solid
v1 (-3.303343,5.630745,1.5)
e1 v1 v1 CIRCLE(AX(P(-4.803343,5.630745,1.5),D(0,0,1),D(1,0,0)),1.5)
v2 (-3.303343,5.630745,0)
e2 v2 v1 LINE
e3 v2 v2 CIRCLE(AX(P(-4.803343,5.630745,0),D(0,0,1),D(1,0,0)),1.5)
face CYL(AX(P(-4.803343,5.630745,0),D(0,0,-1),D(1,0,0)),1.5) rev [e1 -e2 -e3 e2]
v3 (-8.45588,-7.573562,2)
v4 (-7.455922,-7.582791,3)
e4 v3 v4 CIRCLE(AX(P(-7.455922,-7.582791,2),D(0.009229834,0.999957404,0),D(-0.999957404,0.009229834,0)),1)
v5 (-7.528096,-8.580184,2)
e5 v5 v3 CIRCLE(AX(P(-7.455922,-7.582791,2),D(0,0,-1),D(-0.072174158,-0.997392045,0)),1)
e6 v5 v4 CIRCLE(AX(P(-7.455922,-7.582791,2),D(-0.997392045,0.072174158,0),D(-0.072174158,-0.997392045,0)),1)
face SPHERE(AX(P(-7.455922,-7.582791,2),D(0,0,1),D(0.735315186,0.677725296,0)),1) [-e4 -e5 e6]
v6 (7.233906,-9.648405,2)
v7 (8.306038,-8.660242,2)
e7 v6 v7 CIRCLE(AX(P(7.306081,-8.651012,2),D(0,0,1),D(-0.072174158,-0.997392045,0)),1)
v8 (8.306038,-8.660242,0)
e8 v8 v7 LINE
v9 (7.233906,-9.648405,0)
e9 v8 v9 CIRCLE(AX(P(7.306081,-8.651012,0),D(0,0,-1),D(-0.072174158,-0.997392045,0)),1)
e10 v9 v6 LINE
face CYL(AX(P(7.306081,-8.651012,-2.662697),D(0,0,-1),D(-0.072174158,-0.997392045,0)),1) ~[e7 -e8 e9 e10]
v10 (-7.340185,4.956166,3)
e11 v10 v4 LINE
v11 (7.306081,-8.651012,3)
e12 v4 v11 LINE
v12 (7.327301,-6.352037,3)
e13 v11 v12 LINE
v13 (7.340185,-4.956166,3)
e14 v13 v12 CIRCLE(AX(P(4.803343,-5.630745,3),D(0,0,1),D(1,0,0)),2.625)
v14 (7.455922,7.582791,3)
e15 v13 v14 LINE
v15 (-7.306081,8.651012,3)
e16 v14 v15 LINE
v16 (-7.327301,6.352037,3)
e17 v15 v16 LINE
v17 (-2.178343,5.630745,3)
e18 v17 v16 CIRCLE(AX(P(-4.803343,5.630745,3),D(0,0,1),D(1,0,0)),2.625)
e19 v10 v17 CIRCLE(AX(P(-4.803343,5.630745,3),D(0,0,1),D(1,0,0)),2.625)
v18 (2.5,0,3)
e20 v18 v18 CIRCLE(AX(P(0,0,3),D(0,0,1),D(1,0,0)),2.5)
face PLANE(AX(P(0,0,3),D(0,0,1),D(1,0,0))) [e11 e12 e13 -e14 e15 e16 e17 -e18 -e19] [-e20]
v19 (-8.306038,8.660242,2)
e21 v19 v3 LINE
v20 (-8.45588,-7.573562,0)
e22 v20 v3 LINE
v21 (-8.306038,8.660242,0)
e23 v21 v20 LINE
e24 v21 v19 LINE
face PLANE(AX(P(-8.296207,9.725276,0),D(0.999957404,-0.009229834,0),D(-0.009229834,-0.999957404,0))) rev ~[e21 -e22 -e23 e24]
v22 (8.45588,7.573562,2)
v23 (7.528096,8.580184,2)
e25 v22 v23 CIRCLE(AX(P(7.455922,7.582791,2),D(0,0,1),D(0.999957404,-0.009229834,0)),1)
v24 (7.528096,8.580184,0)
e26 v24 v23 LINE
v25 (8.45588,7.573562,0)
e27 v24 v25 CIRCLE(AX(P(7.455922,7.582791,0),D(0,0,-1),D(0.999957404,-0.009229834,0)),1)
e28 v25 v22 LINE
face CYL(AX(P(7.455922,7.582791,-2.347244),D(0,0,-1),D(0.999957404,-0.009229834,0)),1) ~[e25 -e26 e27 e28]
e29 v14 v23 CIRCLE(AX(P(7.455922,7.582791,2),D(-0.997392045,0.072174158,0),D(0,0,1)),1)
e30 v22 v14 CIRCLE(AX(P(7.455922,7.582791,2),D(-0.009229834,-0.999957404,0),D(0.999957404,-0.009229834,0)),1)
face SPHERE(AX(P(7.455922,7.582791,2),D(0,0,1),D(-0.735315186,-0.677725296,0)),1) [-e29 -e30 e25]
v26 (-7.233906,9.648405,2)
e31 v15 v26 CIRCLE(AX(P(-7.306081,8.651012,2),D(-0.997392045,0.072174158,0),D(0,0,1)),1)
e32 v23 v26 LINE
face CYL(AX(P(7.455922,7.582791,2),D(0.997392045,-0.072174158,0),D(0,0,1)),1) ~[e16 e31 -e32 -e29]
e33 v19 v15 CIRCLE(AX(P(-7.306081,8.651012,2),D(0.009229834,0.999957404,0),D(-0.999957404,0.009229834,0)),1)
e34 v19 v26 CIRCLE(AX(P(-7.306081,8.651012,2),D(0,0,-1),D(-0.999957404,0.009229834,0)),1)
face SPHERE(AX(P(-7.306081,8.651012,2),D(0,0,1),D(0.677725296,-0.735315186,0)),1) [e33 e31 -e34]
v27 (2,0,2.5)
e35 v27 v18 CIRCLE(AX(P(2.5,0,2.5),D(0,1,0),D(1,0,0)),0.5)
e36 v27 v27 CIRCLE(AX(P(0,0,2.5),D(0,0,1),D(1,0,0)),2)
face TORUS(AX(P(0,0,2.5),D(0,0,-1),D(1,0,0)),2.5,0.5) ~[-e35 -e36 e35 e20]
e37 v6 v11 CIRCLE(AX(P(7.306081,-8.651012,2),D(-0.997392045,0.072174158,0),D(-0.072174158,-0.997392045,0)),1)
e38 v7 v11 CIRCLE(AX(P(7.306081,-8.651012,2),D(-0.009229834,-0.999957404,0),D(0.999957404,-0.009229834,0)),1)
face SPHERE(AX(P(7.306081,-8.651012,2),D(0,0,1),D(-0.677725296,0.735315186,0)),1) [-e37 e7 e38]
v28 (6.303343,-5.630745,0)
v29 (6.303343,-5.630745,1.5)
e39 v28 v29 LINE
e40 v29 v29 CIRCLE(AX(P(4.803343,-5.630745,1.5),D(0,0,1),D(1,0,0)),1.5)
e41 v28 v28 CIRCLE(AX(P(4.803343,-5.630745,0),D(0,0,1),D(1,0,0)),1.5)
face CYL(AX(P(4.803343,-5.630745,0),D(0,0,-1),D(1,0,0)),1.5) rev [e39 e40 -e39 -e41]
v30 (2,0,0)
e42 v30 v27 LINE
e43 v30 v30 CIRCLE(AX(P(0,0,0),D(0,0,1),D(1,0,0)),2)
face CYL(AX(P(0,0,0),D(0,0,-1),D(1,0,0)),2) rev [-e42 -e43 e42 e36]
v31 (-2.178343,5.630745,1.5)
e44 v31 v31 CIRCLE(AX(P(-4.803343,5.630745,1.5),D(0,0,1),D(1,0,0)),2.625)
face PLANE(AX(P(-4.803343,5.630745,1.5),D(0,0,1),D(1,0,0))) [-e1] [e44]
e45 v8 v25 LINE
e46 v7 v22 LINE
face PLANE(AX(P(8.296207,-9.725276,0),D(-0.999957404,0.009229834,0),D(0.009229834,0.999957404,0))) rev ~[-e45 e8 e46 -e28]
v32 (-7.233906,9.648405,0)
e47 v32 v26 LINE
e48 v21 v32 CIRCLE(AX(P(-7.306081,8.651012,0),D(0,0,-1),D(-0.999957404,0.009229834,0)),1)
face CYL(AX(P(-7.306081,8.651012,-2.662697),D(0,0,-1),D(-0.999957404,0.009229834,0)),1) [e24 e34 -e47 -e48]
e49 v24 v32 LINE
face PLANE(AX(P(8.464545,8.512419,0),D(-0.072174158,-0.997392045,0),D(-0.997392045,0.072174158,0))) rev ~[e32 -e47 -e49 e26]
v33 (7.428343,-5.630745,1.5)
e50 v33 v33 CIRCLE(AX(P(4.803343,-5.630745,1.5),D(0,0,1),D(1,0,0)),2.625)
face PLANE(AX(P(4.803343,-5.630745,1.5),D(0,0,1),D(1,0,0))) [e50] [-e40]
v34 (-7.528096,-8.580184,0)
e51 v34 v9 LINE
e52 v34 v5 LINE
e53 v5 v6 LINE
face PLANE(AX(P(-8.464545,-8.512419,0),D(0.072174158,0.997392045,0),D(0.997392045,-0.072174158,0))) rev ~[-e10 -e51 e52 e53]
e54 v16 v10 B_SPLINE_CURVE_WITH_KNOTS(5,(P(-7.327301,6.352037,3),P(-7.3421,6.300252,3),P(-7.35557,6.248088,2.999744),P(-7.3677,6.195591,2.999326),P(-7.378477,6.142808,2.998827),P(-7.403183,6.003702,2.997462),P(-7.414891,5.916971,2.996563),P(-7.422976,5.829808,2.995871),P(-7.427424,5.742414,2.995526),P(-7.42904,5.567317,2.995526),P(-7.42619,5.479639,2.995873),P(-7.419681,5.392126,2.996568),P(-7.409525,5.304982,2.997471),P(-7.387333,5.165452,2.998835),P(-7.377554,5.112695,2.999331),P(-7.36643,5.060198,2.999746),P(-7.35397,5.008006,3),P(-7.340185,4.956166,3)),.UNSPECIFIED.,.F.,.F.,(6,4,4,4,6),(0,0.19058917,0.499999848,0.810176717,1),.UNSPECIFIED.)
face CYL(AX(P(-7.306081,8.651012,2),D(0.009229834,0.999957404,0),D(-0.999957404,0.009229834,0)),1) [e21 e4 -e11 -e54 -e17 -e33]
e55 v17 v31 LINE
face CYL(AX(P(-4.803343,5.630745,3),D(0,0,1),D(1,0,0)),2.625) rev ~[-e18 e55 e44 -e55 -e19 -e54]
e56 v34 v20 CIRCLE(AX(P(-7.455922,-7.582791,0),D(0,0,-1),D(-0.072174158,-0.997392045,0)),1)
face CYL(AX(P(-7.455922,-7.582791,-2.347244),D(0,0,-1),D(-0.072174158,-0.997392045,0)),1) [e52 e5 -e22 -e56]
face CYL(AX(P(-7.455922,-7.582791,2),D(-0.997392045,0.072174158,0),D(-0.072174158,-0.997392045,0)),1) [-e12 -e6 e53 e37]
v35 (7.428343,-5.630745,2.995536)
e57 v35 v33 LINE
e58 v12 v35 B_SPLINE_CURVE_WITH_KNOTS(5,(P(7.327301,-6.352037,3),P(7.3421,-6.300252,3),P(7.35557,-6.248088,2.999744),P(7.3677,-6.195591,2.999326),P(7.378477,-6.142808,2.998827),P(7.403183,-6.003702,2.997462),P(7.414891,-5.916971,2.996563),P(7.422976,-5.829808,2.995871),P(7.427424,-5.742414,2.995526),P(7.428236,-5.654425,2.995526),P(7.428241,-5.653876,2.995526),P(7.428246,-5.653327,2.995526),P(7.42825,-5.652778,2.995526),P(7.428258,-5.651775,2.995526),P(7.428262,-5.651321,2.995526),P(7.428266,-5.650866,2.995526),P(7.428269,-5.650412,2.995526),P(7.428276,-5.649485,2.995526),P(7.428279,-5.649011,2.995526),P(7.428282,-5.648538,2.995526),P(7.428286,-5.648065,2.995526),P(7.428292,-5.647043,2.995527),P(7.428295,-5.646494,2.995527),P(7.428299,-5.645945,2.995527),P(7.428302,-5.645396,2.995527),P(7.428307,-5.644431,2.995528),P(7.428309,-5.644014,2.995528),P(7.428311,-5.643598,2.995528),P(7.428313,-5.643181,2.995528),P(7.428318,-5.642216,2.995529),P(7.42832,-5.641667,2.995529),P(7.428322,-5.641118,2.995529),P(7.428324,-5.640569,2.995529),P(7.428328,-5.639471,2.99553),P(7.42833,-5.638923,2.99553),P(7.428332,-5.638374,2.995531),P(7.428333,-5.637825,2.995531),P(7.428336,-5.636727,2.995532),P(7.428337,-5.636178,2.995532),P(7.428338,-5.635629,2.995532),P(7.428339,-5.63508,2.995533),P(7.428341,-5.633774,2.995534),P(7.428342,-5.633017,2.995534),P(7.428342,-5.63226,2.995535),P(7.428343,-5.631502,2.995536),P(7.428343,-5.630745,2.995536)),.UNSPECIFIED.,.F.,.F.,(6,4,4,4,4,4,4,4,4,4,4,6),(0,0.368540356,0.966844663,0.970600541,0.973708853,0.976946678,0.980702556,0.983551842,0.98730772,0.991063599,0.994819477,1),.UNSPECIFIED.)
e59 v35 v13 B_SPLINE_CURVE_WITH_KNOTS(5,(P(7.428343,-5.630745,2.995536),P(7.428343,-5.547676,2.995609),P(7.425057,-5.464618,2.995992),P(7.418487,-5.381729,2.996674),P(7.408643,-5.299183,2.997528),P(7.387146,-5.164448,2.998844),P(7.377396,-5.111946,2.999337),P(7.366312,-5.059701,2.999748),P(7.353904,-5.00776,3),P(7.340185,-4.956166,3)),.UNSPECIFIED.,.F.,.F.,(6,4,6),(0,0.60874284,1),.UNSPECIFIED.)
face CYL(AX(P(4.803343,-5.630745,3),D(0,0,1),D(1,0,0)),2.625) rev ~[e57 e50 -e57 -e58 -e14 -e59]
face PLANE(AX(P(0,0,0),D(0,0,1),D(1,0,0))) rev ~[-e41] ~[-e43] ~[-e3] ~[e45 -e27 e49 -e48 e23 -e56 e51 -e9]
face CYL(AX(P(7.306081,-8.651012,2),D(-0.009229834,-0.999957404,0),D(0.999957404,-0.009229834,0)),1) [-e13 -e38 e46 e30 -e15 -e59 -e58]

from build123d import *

# Parameters (mm, degrees)
F0_R         = 2.625
F0_R_2       = 2
F0_R_3       = 1.5
F1_DEPTH     = 3
F2_R         = 2.625
F2_R_2       = 1.5
F3_DEPTH     = 1.5
F4_T1_DEPTH  = 16.2344954865
F4_T3_DEPTH  = 14.8006020278
F4_T5_DEPTH  = 16.2344954865
F4_T7_DEPTH  = 14.8006020278
F4_T9_DEPTH  = 4.3472443006
F4_T11_DEPTH = 4.6626968477
F4_T16_DEPTH = 1
F4_T22_DEPTH = 1
F4_T28_DEPTH = 1
F4_T34_DEPTH = 1
F5_R         = 0.5


# Not quite as in the source:
# - a fillet or chamfer that OpenCascade refuses, or shapes differently, is made with other operations: its cross-section is extruded or revolved along the edge and cut away or added


with BuildPart() as f1:
    # F0 (on Top) → F1 (new body)
    with BuildSketch(Plane.XY):
        Polygon((8.4645454874, 8.5124193832), (-8.2962074114, 9.7252756798), (-8.4645454874, -8.5124193832), (8.2962074114, -9.7252756798), align=None)
        with Locations((4.8033426305, -5.6307453454)):
            Circle(F0_R, mode=Mode.SUBTRACT)
        Polygon((-2.3040371523, -3.3198032774), (-4.02705255, 0.3354530665), (-1.7230153977, 3.6552563439), (2.3040371523, 3.3198032774), (4.02705255, -0.3354530665), (1.7230153977, -3.6552563439), align=None, mode=Mode.SUBTRACT)
        with Locations((-4.8033426305, 5.6307453454)):
            Circle(F0_R, mode=Mode.SUBTRACT)
        Polygon((-1.7230153977, 3.6552563439), (-4.02705255, 0.3354530665), (-2.3040371523, -3.3198032774), (1.7230153977, -3.6552563439), (4.02705255, -0.3354530665), (2.3040371523, 3.3198032774), align=None)
        Circle(F0_R_2, mode=Mode.SUBTRACT)
        with Locations((-4.8033426305, 5.6307453454)):
            Circle(F0_R)
        with Locations((-4.8033426305, 5.6307453454)):
            Circle(F0_R_3, mode=Mode.SUBTRACT)
        with Locations((4.8033426305, -5.6307453454)):
            Circle(F0_R)
        with Locations((4.8033426305, -5.6307453454)):
            Circle(F0_R_3, mode=Mode.SUBTRACT)
    extrude(amount=F1_DEPTH)

    # F2 (on face) → F3 (cut)
    with BuildSketch(Plane.XY.offset(3)):
        with Locations((-4.8033426305, 5.6307453454)):
            Circle(F2_R)
        with Locations((-4.8033426305, 5.6307453454)):
            Circle(F2_R_2, mode=Mode.SUBTRACT)
        with Locations((4.8033426305, -5.6307453454)):
            Circle(F2_R)
        with Locations((4.8033426305, -5.6307453454)):
            Circle(F2_R_2, mode=Mode.SUBTRACT)
    extrude(amount=-F3_DEPTH, mode=Mode.SUBTRACT)

    # F4: fillet of radius 1 on 8 edges, made by hand

    # F4_s2 → F4_t1 (cut)
    with BuildSketch(Plane(origin=(0.0792216076, 8.582844455, 0), x_dir=(0, 0, 1), z_dir=(-0.0092298344, -0.9999574042, 0))):
        with BuildLine():
            ThreePointArc((2, 8.3856167117), (2.7071067812, 8.0927234929), (3, 7.3856167117))
            Line((3, 7.3856167117), (3, 8.3856167117))
            Line((3, 8.3856167117), (2, 8.3856167117))
        make_face()
    extrude(amount=F4_T1_DEPTH, mode=Mode.SUBTRACT)

    # F4_s4 → F4_t3 (cut)
    with BuildSketch(Plane(origin=(6.8712291985, -0.4972219118, 0), x_dir=(0, 0, 1), z_dir=(-0.9973920448, 0.0721741576, 0))):
        with BuildLine():
            ThreePointArc((3, 8.1011408148), (2.7071067812, 8.808247596), (2, 9.1011408148))
            Line((2, 9.1011408148), (3, 9.1011408148))
            Line((3, 9.1011408148), (3, 8.1011408148))
        make_face()
    extrude(amount=F4_T3_DEPTH, mode=Mode.SUBTRACT)

    # F4_s6 → F4_t5 (cut)
    with BuildSketch(Plane(origin=(-0.0792216076, -8.582844455, 0), x_dir=(0, 0, 1), z_dir=(0.0092298344, 0.9999574042, 0))):
        with BuildLine():
            ThreePointArc((2, 8.3856167117), (2.7071067812, 8.0927234929), (3, 7.3856167117))
            Line((3, 7.3856167117), (3, 8.3856167117))
            Line((3, 8.3856167117), (2, 8.3856167117))
        make_face()
    extrude(amount=F4_T5_DEPTH, mode=Mode.SUBTRACT)

    # F4_s8 → F4_t7 (cut)
    with BuildSketch(Plane(origin=(-6.8712291985, 0.4972219118, 0), x_dir=(0, 0, 1), z_dir=(0.9973920448, -0.0721741576, 0))):
        with BuildLine():
            ThreePointArc((2, 9.1011408148), (2.7071067812, 8.808247596), (3, 8.1011408148))
            Line((3, 8.1011408148), (3, 9.1011408148))
            Line((3, 9.1011408148), (2, 9.1011408148))
        make_face()
    extrude(amount=F4_T7_DEPTH, mode=Mode.SUBTRACT)

    # F4_s10 → F4_t9 (cut)
    with BuildSketch(Plane.XY.offset(-2.3472443006)):
        with BuildLine():
            ThreePointArc((8.4558796169, 7.573561656), (8.1912373991, 8.2605167863), (7.5280963703, 8.5801835352))
            Line((7.5280963703, 8.5801835352), (8.4645454874, 8.5124193832))
            Line((8.4645454874, 8.5124193832), (8.4558796169, 7.573561656))
        make_face()
        with BuildLine():
            ThreePointArc((-7.5280963703, -8.5801835352), (-8.1912373991, -8.2605167863), (-8.4558796169, -7.573561656))
            Line((-8.4558796169, -7.573561656), (-8.4645454874, -8.5124193832))
            Line((-8.4645454874, -8.5124193832), (-7.5280963703, -8.5801835352))
        make_face()
    extrude(amount=F4_T9_DEPTH, mode=Mode.SUBTRACT)

    # F4_s12 → F4_t11 (cut)
    with BuildSketch(Plane.XY.offset(-2.6626968477)):
        with BuildLine():
            ThreePointArc((7.23390635, -9.648404519), (7.9838058035, -9.3863276607), (8.3060379118, -8.6602423087))
            Line((8.3060379118, -8.6602423087), (8.2962074114, -9.7252756798))
            Line((8.2962074114, -9.7252756798), (7.23390635, -9.648404519))
        make_face()
        with BuildLine():
            ThreePointArc((-8.3060379118, 8.6602423087), (-7.9838058035, 9.3863276607), (-7.23390635, 9.648404519))
            Line((-7.23390635, 9.648404519), (-8.2962074114, 9.7252756798))
            Line((-8.2962074114, 9.7252756798), (-8.3060379118, 8.6602423087))
        make_face()
    extrude(amount=F4_T11_DEPTH, mode=Mode.SUBTRACT)


with BuildPart() as f4_tool14:
    # F4_s15 → F4_t16 (new body)
    with BuildSketch(Plane.XY.offset(2)):
        Polygon((-7.3060805076, 8.6510124742), (-7.23390635, 9.648404519), (-8.2962074114, 9.7252756798), (-8.3060379118, 8.6602423087), align=None)
    extrude(amount=F4_T16_DEPTH)

    # F4_s17 → F4_t18 (revolve, cut)
    with BuildSketch(Plane(origin=(-7.3060805076, 8.6510124742, 2), x_dir=(0.6777252959, -0.7353151864, 0), z_dir=(-0.7353151864, -0.6777252959, 0))):
        with BuildLine():
            ThreePointArc((0, -1), (1, 0), (0, 1))
            Line((0, 1), (0, -1))
        make_face()
    revolve(axis=Axis((-7.3060805076, 8.6510124742, 2), (0, 0, 1)), mode=Mode.SUBTRACT)


with BuildPart() as f1_1:
    add(f1.part)

    # F4_t13: cut F4_tool14
    add(f4_tool14.part, mode=Mode.SUBTRACT)


with BuildPart() as f4_tool20:
    # F4_s21 → F4_t22 (new body)
    with BuildSketch(Plane.XY.offset(2)):
        Polygon((-7.4559222127, -7.5827914904), (-7.5280963703, -8.5801835352), (-8.4645454874, -8.5124193832), (-8.4558796169, -7.573561656), align=None)
    extrude(amount=F4_T22_DEPTH)

    # F4_s23 → F4_t24 (revolve, cut)
    with BuildSketch(Plane(origin=(-7.4559222127, -7.5827914904, 2), x_dir=(0.7353151864, 0.6777252959, 0), z_dir=(0.6777252959, -0.7353151864, 0))):
        with BuildLine():
            ThreePointArc((0, -1), (1, 0), (0, 1))
            Line((0, 1), (0, -1))
        make_face()
    revolve(axis=Axis((-7.4559222127, -7.5827914904, 2), (0, 0, 1)), mode=Mode.SUBTRACT)


with BuildPart() as f1_2:
    add(f1_1.part)

    # F4_t19: cut F4_tool20
    add(f4_tool20.part, mode=Mode.SUBTRACT)


with BuildPart() as f4_tool26:
    # F4_s27 → F4_t28 (new body)
    with BuildSketch(Plane.XY.offset(2)):
        Polygon((7.4559222127, 7.5827914904), (7.5280963703, 8.5801835352), (8.4645454874, 8.5124193832), (8.4558796169, 7.573561656), align=None)
    extrude(amount=F4_T28_DEPTH)

    # F4_s29 → F4_t30 (revolve, cut)
    with BuildSketch(Plane(origin=(7.4559222127, 7.5827914904, 2), x_dir=(-0.7353151864, -0.6777252959, 0), z_dir=(-0.6777252959, 0.7353151864, 0))):
        with BuildLine():
            ThreePointArc((0, -1), (1, 0), (0, 1))
            Line((0, 1), (0, -1))
        make_face()
    revolve(axis=Axis((7.4559222127, 7.5827914904, 2), (0, 0, 1)), mode=Mode.SUBTRACT)


with BuildPart() as f1_3:
    add(f1_2.part)

    # F4_t25: cut F4_tool26
    add(f4_tool26.part, mode=Mode.SUBTRACT)


with BuildPart() as f4_tool32:
    # F4_s33 → F4_t34 (new body)
    with BuildSketch(Plane.XY.offset(2)):
        Polygon((7.3060805076, -8.6510124742), (7.23390635, -9.648404519), (8.2962074114, -9.7252756798), (8.3060379118, -8.6602423087), align=None)
    extrude(amount=F4_T34_DEPTH)

    # F4_s35 → F4_t36 (revolve, cut)
    with BuildSketch(Plane(origin=(7.3060805076, -8.6510124742, 2), x_dir=(-0.6777252959, 0.7353151864, 0), z_dir=(0.7353151864, 0.6777252959, 0))):
        with BuildLine():
            ThreePointArc((0, -1), (1, 0), (0, 1))
            Line((0, 1), (0, -1))
        make_face()
    revolve(axis=Axis((7.3060805076, -8.6510124742, 2), (0, 0, 1)), mode=Mode.SUBTRACT)


with BuildPart() as f1_4:
    add(f1_3.part)

    # F4_t31: cut F4_tool32
    add(f4_tool32.part, mode=Mode.SUBTRACT)

    # F5
    f5_edges = [f1_4.edges().sort_by_distance(p)[0] for p in [
        (-2, 0, 3),
    ]]
    fillet(f5_edges, radius=F5_R)


solid = f1_4.part
